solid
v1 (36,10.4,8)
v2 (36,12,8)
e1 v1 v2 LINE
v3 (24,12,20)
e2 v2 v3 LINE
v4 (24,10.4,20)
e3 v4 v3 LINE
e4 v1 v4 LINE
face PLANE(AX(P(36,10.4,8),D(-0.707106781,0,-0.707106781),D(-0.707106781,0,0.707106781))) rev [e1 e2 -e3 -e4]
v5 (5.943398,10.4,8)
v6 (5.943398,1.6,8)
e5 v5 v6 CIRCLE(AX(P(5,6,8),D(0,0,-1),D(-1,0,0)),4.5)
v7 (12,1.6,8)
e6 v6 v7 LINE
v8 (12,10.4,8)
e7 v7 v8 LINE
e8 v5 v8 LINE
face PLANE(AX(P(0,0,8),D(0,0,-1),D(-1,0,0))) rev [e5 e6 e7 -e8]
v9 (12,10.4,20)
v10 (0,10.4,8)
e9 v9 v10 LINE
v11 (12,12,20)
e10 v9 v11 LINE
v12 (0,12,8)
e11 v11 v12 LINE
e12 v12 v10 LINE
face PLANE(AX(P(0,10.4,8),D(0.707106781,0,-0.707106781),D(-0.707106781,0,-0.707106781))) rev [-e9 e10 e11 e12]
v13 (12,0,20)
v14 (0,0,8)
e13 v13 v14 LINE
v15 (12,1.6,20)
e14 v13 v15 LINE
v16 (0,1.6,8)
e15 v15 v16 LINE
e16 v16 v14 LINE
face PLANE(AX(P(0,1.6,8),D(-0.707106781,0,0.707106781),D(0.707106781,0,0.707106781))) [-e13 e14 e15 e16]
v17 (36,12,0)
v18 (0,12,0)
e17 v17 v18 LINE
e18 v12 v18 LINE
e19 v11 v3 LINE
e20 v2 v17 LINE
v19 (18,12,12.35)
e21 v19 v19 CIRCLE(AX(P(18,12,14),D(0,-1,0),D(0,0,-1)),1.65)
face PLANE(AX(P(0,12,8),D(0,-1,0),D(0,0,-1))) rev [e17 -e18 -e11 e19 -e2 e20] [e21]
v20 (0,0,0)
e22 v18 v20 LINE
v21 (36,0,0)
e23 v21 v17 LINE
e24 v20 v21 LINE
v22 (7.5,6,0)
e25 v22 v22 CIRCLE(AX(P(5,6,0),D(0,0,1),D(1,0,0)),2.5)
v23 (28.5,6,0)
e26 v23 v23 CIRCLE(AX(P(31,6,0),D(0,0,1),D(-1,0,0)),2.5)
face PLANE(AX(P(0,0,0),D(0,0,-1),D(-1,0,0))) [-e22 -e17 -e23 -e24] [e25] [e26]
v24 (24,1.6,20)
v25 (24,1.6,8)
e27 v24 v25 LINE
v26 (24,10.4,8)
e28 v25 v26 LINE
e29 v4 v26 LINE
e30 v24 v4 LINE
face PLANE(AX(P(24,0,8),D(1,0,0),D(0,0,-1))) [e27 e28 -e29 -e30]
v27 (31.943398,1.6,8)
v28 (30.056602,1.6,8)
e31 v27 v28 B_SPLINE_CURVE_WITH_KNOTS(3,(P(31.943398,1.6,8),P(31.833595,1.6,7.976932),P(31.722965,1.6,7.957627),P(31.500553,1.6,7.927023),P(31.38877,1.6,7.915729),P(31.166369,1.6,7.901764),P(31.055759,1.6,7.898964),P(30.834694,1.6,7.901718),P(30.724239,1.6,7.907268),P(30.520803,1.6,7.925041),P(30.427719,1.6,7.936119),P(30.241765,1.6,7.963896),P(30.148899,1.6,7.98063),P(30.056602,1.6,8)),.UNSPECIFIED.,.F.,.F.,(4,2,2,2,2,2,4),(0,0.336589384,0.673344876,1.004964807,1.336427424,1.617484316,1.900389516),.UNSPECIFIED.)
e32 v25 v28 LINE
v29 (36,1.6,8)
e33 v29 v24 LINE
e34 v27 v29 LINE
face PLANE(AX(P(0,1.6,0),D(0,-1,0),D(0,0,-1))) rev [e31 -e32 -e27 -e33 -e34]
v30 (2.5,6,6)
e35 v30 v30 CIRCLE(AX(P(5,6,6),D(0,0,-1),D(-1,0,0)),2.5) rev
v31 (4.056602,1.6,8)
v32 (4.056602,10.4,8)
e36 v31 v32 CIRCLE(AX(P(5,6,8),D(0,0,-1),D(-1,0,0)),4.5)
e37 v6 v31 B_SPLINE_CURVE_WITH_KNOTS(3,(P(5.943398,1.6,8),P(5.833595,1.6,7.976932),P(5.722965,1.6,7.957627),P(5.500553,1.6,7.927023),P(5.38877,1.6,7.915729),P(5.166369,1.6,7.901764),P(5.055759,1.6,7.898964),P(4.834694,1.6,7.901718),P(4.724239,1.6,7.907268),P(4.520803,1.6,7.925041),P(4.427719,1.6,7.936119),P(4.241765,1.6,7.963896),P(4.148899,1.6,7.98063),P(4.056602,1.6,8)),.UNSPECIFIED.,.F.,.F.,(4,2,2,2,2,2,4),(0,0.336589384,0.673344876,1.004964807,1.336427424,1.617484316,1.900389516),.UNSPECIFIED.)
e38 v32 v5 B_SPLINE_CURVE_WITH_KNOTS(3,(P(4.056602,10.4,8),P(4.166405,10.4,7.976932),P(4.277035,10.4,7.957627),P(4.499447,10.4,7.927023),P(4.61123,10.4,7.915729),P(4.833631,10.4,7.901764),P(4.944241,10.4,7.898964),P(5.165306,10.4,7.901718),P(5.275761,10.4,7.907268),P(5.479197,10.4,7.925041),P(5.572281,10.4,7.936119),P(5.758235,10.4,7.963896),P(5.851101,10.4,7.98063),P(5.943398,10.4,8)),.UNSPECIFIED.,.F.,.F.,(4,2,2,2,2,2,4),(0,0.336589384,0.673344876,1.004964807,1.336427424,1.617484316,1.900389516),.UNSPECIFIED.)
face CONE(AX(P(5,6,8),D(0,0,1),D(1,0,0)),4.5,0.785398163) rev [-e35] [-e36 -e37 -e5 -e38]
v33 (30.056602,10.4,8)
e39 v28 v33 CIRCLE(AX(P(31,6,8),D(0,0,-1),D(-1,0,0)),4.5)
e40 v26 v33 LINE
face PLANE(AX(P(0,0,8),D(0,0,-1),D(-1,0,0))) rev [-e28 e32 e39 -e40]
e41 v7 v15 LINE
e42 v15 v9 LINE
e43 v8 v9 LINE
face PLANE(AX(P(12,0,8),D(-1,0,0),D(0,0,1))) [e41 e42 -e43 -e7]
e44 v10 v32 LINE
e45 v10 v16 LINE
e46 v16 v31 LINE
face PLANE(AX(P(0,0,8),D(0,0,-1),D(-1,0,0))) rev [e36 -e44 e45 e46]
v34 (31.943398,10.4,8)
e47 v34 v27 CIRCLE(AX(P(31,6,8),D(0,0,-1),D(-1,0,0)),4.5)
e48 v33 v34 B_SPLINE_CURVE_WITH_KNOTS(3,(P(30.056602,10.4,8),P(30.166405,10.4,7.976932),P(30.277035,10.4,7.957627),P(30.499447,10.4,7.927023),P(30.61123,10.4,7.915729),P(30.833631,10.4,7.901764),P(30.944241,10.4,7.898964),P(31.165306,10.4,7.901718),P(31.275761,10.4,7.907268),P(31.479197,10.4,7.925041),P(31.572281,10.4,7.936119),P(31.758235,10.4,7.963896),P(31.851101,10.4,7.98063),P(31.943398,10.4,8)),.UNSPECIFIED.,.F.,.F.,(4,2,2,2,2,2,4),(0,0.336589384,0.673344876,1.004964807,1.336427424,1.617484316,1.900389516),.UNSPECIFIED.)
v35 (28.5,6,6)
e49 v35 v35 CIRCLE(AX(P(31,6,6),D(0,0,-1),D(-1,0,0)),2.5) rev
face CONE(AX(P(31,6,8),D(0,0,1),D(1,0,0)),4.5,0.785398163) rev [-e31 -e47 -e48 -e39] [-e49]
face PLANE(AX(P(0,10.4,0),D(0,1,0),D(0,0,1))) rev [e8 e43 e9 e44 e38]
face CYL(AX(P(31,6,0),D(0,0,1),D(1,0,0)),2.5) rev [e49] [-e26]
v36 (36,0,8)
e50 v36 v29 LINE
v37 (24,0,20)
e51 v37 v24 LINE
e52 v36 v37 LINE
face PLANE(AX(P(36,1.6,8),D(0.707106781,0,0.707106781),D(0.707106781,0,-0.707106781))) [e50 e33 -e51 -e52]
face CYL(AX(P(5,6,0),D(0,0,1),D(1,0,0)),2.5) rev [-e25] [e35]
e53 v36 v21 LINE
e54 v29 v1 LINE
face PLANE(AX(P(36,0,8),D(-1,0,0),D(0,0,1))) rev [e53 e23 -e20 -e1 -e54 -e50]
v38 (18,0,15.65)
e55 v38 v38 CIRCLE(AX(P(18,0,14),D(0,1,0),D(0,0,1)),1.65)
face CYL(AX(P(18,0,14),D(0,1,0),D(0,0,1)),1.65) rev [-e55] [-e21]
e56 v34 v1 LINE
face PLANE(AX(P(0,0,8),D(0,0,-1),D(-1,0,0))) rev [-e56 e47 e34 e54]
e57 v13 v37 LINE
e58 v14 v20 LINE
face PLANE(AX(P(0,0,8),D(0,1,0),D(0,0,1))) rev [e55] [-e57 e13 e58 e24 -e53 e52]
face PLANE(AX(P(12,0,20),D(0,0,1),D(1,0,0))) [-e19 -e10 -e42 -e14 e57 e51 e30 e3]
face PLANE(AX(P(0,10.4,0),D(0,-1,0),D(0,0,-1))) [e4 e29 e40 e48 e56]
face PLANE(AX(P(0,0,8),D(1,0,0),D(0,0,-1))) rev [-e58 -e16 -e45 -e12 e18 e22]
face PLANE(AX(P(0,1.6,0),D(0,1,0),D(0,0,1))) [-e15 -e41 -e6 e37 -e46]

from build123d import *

# Parameters (mm, degrees)
ESQUISSE1_W                  = 36
ESQUISSE1_H                  = 12
BOSS_EXTRU_1_DEPTH           = 8
ENL_V_MAT_EXTRU_1_DEPTH      = 39.781438859
ENL_V_MAT_EXTRU_1_DEPTH_BACK = 39.781438859
ESQUISSE2_R                  = 2.5
ESQUISSE3_W                  = 12
ESQUISSE3_H                  = 12
BOSS_EXTRU_2_DEPTH           = 12
ENL_V_MAT_EXTRU_2_DEPTH      = 43.895221179
ENL_V_MAT_EXTRU_2_DEPTH_BACK = 43.895221179
ESQUISSE4_R                  = 1.65
BOSS_EXTRU_3_DEPTH           = 1.6
BOSS_EXTRU_4_START           = -12
BOSS_EXTRU_4_DEPTH           = 1.6
CHANFREIN1_SIZE              = 2


with BuildPart() as part:
    # Esquisse1 → Boss.-Extru.1 (new body)
    with BuildSketch(Plane.XY):
        with Locations((18, 6)):
            Rectangle(ESQUISSE1_W, ESQUISSE1_H)
    extrude(amount=BOSS_EXTRU_1_DEPTH)

    # Esquisse2 → Enlèv. mat.-Extru.1 (cut, two sides: drawn at the far end of the back side and taken through both)
    with BuildSketch(Plane.XY.offset(8).offset(-ENL_V_MAT_EXTRU_1_DEPTH_BACK)):
        with Locations((5, 6)):
            Circle(ESQUISSE2_R)
        with Locations(Location((31, 6, 0), (0, 0, 180))):
            Circle(ESQUISSE2_R)
    extrude(amount=ENL_V_MAT_EXTRU_1_DEPTH + ENL_V_MAT_EXTRU_1_DEPTH_BACK, mode=Mode.SUBTRACT)

    # Esquisse3 → Boss.-Extru.2 (add)
    with BuildSketch(Plane(origin=(0, 12, 0), x_dir=(1, 0, 0), z_dir=(0, 1, 0))):
        with Locations((18, -14)):
            Rectangle(ESQUISSE3_W, ESQUISSE3_H)
    extrude(amount=-BOSS_EXTRU_2_DEPTH)

    # Esquisse4 → Enlèv. mat.-Extru.2 (cut, two sides: drawn at the far end of the back side and taken through both)
    with BuildSketch(Plane(origin=(0, 12, 0), x_dir=(1, 0, 0), z_dir=(0, 1, 0)).offset(-ENL_V_MAT_EXTRU_2_DEPTH_BACK)):
        with Locations(Location((18, -14, 0), (0, 0, 270))):
            Circle(ESQUISSE4_R)
    extrude(amount=ENL_V_MAT_EXTRU_2_DEPTH + ENL_V_MAT_EXTRU_2_DEPTH_BACK, mode=Mode.SUBTRACT)

    # Esquisse5 → Boss.-Extru.3 (add)
    with BuildSketch(Plane.XZ):
        Polygon((12, 8), (0, 8), (12, 20), align=None)
        Polygon((24, 20), (24, 8), (36, 8), align=None)
    extrude(amount=-BOSS_EXTRU_3_DEPTH)

    # Esquisse5<2> → Boss.-Extru.4 (add)
    with BuildSketch(Plane.XZ.offset(BOSS_EXTRU_4_START)):
        Polygon((12, 8), (0, 8), (12, 20), align=None)
        Polygon((24, 20), (24, 8), (36, 8), align=None)
    extrude(amount=BOSS_EXTRU_4_DEPTH)

    # Chanfrein1
    # the kernel refuses this chamfer: 2 mm, written as the material it takes off along each edge
    with BuildSketch(Plane(origin=(5, 6, 8), x_dir=(1, 0, 0), z_dir=(0, -1, 0))) as chanfrein1_piece_1_section:
        Polygon((2.5 + CHANFREIN1_SIZE, 0), (2.5, -CHANFREIN1_SIZE), (2.5, 0), align=None)
    chanfrein1_piece_1 = revolve(axis=Axis((5, 6, 8), (0, 0, 1)), mode=Mode.PRIVATE)
    chanfrein1_piece_1 = split(chanfrein1_piece_1, bisect_by=Plane(origin=(1.524895904, 1.6, 7.024895904), z_dir=(0, 1, 0)), keep=Keep.TOP, mode=Mode.PRIVATE)
    chanfrein1_piece_1 = split(chanfrein1_piece_1, bisect_by=Plane(origin=(1.524895904, 10.4, 7.024895904), z_dir=(0, -1, 0)), keep=Keep.TOP, mode=Mode.PRIVATE)
    add(chanfrein1_piece_1, mode=Mode.SUBTRACT)
    with BuildSketch(Plane(origin=(31, 6, 8), x_dir=(-1, 0, 0), z_dir=(0, 1, 0))) as chanfrein1_piece_2_section:
        Polygon((2.5 + CHANFREIN1_SIZE, 0), (2.5, -CHANFREIN1_SIZE), (2.5, 0), align=None)
    chanfrein1_piece_2 = revolve(axis=Axis((31, 6, 8), (0, 0, 1)), mode=Mode.PRIVATE)
    chanfrein1_piece_2 = split(chanfrein1_piece_2, bisect_by=Plane(origin=(34.475104096, 1.6, 7.024895904), z_dir=(0, 1, 0)), keep=Keep.TOP, mode=Mode.PRIVATE)
    chanfrein1_piece_2 = split(chanfrein1_piece_2, bisect_by=Plane(origin=(34.475104096, 10.4, 7.024895904), z_dir=(0, -1, 0)), keep=Keep.TOP, mode=Mode.PRIVATE)
    add(chanfrein1_piece_2, mode=Mode.SUBTRACT)


solid = part.part
